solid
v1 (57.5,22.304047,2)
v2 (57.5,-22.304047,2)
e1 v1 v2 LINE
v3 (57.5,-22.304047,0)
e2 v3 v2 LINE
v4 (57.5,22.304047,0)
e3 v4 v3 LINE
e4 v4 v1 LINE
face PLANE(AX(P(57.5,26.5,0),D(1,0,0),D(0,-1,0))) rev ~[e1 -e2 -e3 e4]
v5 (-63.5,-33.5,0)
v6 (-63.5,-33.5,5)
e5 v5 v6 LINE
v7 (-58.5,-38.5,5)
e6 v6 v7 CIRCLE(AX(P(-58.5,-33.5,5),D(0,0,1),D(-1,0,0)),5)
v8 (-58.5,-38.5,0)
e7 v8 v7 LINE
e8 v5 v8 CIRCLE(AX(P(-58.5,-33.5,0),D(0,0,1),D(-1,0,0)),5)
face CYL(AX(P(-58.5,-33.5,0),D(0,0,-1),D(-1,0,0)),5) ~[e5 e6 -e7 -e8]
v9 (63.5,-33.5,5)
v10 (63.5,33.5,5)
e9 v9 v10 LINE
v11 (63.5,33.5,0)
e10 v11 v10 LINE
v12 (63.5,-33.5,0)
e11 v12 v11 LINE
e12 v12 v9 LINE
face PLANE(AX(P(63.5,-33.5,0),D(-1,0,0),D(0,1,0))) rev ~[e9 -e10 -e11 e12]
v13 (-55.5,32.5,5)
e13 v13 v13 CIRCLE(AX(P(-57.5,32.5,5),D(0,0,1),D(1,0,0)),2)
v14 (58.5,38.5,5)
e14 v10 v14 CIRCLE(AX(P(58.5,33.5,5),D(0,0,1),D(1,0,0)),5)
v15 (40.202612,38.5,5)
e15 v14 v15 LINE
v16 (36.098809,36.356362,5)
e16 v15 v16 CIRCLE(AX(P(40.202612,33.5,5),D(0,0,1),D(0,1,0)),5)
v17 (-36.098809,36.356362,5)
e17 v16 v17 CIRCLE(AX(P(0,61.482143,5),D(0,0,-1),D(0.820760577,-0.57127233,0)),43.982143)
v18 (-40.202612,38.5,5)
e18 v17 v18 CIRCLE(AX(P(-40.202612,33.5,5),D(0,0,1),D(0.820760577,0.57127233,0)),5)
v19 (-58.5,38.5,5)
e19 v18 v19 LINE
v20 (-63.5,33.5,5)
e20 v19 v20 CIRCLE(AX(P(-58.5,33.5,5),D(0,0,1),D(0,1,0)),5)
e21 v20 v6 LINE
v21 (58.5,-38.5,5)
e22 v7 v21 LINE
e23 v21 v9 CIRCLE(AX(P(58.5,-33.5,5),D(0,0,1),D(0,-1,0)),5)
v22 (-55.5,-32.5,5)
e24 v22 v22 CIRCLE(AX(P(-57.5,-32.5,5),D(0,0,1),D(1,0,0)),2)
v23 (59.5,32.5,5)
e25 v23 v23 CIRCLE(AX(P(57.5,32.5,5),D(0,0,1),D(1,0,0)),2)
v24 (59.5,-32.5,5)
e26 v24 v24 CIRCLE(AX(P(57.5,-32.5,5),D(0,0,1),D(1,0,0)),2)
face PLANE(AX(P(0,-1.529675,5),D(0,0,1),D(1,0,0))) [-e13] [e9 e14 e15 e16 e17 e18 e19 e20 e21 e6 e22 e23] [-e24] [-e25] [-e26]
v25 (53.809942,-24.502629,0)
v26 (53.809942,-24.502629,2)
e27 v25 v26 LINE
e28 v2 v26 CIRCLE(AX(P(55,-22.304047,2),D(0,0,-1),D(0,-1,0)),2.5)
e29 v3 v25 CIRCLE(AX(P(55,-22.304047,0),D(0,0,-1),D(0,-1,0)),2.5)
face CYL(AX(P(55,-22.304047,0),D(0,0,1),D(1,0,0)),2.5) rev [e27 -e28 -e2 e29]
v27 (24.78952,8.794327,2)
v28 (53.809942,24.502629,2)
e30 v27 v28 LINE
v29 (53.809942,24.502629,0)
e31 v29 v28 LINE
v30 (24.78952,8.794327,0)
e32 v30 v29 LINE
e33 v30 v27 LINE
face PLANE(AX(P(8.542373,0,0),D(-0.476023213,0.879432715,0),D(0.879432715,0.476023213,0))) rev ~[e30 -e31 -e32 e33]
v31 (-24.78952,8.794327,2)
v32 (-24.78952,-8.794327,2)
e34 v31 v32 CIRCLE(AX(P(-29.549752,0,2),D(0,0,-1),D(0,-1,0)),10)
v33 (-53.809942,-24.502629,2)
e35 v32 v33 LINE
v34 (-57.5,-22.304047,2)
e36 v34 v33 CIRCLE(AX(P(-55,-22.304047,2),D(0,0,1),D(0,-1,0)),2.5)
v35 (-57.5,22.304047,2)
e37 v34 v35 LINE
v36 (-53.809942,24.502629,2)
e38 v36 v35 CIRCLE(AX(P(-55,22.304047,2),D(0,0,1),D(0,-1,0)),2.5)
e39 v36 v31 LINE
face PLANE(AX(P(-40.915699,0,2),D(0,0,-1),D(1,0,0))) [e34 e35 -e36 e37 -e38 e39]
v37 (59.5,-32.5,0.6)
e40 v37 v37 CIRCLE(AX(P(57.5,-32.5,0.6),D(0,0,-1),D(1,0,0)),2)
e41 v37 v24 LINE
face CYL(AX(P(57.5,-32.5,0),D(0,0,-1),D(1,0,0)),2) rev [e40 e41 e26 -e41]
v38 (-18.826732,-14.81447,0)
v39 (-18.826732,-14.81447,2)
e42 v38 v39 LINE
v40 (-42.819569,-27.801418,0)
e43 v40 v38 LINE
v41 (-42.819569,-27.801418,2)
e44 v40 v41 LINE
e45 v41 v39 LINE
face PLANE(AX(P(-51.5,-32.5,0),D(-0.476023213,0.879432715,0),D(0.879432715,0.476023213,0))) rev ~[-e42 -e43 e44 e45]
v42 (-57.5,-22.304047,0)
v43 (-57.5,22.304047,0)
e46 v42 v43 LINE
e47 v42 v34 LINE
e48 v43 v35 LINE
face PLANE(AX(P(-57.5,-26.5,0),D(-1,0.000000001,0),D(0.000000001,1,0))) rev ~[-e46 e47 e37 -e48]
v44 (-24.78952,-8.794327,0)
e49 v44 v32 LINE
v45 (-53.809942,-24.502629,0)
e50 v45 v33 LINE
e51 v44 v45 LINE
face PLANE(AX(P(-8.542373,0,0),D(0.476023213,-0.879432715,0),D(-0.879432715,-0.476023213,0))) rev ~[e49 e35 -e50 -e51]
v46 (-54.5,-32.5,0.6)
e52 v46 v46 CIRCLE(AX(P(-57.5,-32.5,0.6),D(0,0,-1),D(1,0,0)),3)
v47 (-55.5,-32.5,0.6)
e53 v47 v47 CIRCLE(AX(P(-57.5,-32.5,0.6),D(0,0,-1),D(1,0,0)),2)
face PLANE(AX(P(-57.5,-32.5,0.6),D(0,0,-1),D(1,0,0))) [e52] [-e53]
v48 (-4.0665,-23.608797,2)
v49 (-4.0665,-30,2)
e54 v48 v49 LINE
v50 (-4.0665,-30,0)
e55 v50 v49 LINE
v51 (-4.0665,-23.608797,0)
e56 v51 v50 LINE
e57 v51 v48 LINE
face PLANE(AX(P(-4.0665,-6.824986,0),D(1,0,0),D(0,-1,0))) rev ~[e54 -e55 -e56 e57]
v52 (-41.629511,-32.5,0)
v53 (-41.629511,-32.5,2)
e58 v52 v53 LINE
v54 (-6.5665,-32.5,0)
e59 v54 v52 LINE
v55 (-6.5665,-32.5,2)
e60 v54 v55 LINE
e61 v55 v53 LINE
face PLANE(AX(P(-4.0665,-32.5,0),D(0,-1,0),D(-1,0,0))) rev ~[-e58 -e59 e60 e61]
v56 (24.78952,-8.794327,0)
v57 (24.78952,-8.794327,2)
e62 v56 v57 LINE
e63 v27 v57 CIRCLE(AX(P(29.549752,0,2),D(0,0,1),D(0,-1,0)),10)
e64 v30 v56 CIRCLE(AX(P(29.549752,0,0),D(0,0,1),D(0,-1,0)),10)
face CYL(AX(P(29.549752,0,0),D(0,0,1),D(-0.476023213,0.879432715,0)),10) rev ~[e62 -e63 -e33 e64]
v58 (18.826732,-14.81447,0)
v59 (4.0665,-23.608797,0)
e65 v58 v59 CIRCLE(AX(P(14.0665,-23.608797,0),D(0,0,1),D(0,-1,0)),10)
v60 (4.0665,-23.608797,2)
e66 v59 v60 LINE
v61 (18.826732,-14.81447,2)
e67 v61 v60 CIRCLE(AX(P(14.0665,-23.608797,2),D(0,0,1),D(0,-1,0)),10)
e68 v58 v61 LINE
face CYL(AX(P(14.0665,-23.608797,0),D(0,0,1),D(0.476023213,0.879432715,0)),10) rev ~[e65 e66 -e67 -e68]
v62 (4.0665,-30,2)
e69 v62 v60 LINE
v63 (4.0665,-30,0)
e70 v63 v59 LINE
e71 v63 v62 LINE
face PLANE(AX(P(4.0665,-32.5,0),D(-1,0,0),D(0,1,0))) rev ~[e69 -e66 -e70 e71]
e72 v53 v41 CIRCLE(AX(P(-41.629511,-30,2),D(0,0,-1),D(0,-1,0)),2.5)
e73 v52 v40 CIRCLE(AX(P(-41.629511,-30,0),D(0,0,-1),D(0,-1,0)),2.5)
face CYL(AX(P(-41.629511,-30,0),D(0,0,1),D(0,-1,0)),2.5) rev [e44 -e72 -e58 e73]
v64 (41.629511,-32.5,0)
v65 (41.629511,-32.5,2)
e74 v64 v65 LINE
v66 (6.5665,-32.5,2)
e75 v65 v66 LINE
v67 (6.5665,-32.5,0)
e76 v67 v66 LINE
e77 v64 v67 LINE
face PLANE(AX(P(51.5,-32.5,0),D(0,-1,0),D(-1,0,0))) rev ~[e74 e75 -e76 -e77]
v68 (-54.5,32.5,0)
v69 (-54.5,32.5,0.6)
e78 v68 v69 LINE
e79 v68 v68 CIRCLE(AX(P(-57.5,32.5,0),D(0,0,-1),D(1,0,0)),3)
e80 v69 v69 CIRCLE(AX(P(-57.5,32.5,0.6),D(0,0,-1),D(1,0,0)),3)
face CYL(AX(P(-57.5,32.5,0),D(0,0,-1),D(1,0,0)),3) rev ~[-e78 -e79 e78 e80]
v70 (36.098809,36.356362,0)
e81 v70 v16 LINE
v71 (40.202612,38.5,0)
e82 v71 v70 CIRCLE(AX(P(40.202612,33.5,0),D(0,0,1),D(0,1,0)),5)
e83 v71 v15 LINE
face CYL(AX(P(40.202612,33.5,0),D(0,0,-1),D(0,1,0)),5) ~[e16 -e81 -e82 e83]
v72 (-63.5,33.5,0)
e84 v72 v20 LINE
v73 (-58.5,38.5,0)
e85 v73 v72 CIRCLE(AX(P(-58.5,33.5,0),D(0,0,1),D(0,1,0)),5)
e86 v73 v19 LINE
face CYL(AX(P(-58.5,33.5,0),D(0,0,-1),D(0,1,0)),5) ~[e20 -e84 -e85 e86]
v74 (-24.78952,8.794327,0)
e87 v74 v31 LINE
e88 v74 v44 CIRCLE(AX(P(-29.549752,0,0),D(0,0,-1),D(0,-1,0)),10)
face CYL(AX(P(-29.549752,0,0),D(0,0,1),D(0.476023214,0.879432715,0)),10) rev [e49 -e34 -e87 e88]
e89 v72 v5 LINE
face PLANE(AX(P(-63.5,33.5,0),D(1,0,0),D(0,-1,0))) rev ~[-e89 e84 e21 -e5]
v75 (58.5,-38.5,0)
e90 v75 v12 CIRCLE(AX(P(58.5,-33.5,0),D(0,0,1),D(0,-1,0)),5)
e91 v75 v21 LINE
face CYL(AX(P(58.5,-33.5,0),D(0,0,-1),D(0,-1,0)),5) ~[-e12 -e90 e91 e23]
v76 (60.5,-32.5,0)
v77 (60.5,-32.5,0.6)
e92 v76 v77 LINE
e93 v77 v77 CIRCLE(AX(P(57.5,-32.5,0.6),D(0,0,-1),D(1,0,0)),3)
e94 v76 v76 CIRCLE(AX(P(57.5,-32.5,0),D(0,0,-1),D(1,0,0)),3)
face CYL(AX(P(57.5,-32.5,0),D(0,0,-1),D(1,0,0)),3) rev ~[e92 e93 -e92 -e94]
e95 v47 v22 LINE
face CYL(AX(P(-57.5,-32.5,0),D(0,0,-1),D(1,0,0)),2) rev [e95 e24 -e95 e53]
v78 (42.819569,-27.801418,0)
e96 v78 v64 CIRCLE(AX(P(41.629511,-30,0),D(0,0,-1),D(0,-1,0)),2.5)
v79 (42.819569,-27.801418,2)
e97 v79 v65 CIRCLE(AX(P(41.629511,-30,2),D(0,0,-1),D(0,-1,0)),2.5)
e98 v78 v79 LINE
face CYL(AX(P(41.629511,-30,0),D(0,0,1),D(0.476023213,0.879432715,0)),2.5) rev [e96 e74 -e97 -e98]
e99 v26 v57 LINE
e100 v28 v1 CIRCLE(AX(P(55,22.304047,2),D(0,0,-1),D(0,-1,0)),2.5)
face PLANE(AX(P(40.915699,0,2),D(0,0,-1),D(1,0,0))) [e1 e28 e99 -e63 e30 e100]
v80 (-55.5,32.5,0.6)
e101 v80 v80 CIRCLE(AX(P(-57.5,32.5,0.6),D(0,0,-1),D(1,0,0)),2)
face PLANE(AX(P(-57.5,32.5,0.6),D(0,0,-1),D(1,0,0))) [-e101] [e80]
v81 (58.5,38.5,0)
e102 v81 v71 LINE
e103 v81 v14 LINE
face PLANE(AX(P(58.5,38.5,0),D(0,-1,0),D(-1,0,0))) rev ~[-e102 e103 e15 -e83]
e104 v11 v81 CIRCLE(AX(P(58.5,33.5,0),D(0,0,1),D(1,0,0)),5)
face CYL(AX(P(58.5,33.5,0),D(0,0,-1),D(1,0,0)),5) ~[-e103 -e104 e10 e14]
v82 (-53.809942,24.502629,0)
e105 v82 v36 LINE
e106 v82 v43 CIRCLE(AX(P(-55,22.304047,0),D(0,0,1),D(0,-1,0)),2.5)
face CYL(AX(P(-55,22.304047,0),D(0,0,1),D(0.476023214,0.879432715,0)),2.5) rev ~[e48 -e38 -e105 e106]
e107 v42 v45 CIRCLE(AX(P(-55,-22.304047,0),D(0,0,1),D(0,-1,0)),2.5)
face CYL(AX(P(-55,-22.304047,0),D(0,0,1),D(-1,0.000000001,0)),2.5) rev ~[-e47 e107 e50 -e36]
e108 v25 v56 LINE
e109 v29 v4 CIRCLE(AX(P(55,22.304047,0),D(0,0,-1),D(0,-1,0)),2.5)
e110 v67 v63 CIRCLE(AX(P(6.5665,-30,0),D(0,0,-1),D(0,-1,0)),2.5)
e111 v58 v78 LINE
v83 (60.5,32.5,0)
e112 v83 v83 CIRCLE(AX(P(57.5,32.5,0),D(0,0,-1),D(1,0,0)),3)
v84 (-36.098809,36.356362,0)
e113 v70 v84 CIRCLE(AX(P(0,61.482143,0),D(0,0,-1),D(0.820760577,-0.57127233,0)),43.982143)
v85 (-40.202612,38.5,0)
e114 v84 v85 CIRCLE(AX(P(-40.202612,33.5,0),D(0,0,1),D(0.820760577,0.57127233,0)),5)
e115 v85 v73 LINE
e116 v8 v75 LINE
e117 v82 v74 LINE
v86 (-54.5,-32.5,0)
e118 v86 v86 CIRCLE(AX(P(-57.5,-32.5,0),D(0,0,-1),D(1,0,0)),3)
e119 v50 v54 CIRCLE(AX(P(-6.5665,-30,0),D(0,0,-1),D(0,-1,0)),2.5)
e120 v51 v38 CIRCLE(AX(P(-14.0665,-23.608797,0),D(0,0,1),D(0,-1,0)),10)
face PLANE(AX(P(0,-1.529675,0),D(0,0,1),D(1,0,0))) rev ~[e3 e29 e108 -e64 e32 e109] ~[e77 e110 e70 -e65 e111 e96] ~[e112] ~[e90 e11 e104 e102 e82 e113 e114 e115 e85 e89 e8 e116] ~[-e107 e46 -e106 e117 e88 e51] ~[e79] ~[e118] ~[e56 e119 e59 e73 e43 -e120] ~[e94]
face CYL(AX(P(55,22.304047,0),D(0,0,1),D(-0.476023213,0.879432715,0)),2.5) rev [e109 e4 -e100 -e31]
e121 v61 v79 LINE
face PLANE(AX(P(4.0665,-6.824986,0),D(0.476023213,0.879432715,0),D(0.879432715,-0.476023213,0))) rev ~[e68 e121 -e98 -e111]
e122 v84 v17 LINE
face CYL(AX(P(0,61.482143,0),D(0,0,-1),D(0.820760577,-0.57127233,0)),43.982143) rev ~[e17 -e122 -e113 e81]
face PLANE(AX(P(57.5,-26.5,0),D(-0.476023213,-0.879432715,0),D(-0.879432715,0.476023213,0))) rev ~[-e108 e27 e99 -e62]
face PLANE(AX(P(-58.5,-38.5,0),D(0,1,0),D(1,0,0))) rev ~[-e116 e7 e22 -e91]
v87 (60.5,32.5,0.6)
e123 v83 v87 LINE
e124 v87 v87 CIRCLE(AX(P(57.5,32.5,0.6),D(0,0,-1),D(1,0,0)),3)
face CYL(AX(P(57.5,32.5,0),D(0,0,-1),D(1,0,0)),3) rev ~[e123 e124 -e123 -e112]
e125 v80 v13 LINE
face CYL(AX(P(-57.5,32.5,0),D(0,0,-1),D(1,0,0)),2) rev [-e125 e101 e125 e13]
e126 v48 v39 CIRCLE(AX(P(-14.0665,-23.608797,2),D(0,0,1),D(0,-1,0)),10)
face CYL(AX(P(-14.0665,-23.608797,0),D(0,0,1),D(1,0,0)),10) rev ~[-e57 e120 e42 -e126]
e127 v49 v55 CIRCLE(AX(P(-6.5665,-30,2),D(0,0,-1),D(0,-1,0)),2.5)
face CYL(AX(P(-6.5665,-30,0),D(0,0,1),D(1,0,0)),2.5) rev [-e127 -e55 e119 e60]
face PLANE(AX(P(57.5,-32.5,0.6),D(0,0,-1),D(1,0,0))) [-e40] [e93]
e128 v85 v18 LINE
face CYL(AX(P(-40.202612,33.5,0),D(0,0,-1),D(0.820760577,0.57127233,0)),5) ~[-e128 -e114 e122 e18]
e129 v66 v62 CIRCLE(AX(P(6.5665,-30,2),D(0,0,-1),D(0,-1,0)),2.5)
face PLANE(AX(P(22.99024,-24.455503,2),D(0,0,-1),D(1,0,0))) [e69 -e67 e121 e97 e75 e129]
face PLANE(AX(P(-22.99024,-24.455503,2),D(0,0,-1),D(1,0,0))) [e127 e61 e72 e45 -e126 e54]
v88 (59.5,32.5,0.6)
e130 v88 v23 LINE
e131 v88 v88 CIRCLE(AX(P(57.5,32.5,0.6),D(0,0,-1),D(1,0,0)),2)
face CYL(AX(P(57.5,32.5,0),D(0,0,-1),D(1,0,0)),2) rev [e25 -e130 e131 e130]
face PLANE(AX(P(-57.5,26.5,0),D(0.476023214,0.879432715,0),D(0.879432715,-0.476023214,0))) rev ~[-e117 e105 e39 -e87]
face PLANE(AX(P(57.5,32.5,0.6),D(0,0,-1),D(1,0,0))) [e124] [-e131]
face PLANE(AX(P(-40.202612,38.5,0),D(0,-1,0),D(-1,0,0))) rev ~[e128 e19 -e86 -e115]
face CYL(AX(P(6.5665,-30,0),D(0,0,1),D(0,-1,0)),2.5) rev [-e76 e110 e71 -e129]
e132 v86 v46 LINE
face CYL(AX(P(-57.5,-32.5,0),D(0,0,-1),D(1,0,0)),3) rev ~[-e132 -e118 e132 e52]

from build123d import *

# Parameters (mm, degrees)
F0_R     = 2
F1_DEPTH = 5
F2_R     = 3
F3_DEPTH = 0.6
F5_DEPTH = 2
F6_R     = 10
F7_R     = 2.5


with BuildPart() as f1:
    # F0 (on Top) → F1 (new body)
    with BuildSketch(Plane.XY):
        with BuildLine():
            Line((-58.5, -38.5), (58.5, -38.5))
            ThreePointArc((58.5, -38.5), (62.0355339059, -37.0355339059), (63.5, -33.5))
            Line((63.5, -33.5), (63.5, 33.5))
            ThreePointArc((63.5, 33.5), (62.0355339059, 37.0355339059), (58.5, 38.5))
            Line((58.5, 38.5), (40.2026118555, 38.5))
            ThreePointArc((40.2026118555, 38.5), (37.8876397432, 37.9318059659), (36.0988089683, 36.3563616478))
            ThreePointArc((36.0988089683, 36.3563616478), (0, 17.5), (-36.0988089683, 36.3563616478))
            ThreePointArc((-36.0988089683, 36.3563616478), (-37.8876397432, 37.9318059659), (-40.2026118555, 38.5))
            Line((-40.2026118555, 38.5), (-58.5, 38.5))
            ThreePointArc((-58.5, 38.5), (-62.0355339059, 37.0355339059), (-63.5, 33.5))
            Line((-63.5, 33.5), (-63.5, -33.5))
            ThreePointArc((-63.5, -33.5), (-62.0355339059, -37.0355339059), (-58.5, -38.5))
        make_face()
        with Locations((-57.5, -32.5)):
            Circle(F0_R, mode=Mode.SUBTRACT)
        with Locations((57.5, -32.5)):
            Circle(F0_R, mode=Mode.SUBTRACT)
        with Locations((-57.5, 32.5)):
            Circle(F0_R, mode=Mode.SUBTRACT)
        with Locations((57.5, 32.5)):
            Circle(F0_R, mode=Mode.SUBTRACT)
    extrude(amount=F1_DEPTH)

    # F2 (on face) → F3 (cut)
    with BuildSketch(Plane(origin=(0, 0, 0), x_dir=(1, 0, 0), z_dir=(0, 0, -1))):
        with Locations((-57.5, 32.5)):
            Circle(F2_R)
        with Locations((57.5, 32.5)):
            Circle(F2_R)
        with Locations((57.5, -32.5)):
            Circle(F2_R)
        with Locations((-57.5, -32.5)):
            Circle(F2_R)
    extrude(amount=-F3_DEPTH, mode=Mode.SUBTRACT)

    # F4 (on face) → F5 (cut)
    with BuildSketch(Plane(origin=(0, 0, 0), x_dir=(1, 0, 0), z_dir=(0, 0, -1))):
        Polygon((-8.542372966, 0), (-57.5000000613, 26.5), (-57.5, -26.5), align=None)
        Polygon((-4.0665, 32.5000000613), (-51.5, 32.5000000613), (-4.0665, 6.8249862876), align=None)
        Polygon((51.5, 32.5000000613), (4.0665, 32.5000000613), (4.0665, 6.8249862876), align=None)
        Polygon((57.5000000613, 26.5), (8.542372966, 0), (57.5000000613, -26.5), align=None)
    extrude(amount=-F5_DEPTH, mode=Mode.SUBTRACT)

    # F6
    f6_edges = [f1.edges().sort_by_distance(p)[0] for p in [
        (8.542373, 0, 1),
        (-8.542373, 0, 1),
        (-4.0665, -6.824986, 1),
        (4.0665, -6.824986, 1),
    ]]
    fillet(f6_edges, radius=F6_R)

    # F7
    f7_edges = [f1.edges().sort_by_distance(p)[0] for p in [
        (-51.5, -32.5, 1),
        (51.5, -32.5, 1),
        (57.5, -26.5, 1),
        (57.5, 26.5, 1),
        (-57.5, 26.5, 1),
        (-57.5, -26.5, 1),
        (4.0665, -32.5, 1),
        (-4.0665, -32.5, 1),
    ]]
    fillet(f7_edges, radius=F7_R)


solid = f1.part
